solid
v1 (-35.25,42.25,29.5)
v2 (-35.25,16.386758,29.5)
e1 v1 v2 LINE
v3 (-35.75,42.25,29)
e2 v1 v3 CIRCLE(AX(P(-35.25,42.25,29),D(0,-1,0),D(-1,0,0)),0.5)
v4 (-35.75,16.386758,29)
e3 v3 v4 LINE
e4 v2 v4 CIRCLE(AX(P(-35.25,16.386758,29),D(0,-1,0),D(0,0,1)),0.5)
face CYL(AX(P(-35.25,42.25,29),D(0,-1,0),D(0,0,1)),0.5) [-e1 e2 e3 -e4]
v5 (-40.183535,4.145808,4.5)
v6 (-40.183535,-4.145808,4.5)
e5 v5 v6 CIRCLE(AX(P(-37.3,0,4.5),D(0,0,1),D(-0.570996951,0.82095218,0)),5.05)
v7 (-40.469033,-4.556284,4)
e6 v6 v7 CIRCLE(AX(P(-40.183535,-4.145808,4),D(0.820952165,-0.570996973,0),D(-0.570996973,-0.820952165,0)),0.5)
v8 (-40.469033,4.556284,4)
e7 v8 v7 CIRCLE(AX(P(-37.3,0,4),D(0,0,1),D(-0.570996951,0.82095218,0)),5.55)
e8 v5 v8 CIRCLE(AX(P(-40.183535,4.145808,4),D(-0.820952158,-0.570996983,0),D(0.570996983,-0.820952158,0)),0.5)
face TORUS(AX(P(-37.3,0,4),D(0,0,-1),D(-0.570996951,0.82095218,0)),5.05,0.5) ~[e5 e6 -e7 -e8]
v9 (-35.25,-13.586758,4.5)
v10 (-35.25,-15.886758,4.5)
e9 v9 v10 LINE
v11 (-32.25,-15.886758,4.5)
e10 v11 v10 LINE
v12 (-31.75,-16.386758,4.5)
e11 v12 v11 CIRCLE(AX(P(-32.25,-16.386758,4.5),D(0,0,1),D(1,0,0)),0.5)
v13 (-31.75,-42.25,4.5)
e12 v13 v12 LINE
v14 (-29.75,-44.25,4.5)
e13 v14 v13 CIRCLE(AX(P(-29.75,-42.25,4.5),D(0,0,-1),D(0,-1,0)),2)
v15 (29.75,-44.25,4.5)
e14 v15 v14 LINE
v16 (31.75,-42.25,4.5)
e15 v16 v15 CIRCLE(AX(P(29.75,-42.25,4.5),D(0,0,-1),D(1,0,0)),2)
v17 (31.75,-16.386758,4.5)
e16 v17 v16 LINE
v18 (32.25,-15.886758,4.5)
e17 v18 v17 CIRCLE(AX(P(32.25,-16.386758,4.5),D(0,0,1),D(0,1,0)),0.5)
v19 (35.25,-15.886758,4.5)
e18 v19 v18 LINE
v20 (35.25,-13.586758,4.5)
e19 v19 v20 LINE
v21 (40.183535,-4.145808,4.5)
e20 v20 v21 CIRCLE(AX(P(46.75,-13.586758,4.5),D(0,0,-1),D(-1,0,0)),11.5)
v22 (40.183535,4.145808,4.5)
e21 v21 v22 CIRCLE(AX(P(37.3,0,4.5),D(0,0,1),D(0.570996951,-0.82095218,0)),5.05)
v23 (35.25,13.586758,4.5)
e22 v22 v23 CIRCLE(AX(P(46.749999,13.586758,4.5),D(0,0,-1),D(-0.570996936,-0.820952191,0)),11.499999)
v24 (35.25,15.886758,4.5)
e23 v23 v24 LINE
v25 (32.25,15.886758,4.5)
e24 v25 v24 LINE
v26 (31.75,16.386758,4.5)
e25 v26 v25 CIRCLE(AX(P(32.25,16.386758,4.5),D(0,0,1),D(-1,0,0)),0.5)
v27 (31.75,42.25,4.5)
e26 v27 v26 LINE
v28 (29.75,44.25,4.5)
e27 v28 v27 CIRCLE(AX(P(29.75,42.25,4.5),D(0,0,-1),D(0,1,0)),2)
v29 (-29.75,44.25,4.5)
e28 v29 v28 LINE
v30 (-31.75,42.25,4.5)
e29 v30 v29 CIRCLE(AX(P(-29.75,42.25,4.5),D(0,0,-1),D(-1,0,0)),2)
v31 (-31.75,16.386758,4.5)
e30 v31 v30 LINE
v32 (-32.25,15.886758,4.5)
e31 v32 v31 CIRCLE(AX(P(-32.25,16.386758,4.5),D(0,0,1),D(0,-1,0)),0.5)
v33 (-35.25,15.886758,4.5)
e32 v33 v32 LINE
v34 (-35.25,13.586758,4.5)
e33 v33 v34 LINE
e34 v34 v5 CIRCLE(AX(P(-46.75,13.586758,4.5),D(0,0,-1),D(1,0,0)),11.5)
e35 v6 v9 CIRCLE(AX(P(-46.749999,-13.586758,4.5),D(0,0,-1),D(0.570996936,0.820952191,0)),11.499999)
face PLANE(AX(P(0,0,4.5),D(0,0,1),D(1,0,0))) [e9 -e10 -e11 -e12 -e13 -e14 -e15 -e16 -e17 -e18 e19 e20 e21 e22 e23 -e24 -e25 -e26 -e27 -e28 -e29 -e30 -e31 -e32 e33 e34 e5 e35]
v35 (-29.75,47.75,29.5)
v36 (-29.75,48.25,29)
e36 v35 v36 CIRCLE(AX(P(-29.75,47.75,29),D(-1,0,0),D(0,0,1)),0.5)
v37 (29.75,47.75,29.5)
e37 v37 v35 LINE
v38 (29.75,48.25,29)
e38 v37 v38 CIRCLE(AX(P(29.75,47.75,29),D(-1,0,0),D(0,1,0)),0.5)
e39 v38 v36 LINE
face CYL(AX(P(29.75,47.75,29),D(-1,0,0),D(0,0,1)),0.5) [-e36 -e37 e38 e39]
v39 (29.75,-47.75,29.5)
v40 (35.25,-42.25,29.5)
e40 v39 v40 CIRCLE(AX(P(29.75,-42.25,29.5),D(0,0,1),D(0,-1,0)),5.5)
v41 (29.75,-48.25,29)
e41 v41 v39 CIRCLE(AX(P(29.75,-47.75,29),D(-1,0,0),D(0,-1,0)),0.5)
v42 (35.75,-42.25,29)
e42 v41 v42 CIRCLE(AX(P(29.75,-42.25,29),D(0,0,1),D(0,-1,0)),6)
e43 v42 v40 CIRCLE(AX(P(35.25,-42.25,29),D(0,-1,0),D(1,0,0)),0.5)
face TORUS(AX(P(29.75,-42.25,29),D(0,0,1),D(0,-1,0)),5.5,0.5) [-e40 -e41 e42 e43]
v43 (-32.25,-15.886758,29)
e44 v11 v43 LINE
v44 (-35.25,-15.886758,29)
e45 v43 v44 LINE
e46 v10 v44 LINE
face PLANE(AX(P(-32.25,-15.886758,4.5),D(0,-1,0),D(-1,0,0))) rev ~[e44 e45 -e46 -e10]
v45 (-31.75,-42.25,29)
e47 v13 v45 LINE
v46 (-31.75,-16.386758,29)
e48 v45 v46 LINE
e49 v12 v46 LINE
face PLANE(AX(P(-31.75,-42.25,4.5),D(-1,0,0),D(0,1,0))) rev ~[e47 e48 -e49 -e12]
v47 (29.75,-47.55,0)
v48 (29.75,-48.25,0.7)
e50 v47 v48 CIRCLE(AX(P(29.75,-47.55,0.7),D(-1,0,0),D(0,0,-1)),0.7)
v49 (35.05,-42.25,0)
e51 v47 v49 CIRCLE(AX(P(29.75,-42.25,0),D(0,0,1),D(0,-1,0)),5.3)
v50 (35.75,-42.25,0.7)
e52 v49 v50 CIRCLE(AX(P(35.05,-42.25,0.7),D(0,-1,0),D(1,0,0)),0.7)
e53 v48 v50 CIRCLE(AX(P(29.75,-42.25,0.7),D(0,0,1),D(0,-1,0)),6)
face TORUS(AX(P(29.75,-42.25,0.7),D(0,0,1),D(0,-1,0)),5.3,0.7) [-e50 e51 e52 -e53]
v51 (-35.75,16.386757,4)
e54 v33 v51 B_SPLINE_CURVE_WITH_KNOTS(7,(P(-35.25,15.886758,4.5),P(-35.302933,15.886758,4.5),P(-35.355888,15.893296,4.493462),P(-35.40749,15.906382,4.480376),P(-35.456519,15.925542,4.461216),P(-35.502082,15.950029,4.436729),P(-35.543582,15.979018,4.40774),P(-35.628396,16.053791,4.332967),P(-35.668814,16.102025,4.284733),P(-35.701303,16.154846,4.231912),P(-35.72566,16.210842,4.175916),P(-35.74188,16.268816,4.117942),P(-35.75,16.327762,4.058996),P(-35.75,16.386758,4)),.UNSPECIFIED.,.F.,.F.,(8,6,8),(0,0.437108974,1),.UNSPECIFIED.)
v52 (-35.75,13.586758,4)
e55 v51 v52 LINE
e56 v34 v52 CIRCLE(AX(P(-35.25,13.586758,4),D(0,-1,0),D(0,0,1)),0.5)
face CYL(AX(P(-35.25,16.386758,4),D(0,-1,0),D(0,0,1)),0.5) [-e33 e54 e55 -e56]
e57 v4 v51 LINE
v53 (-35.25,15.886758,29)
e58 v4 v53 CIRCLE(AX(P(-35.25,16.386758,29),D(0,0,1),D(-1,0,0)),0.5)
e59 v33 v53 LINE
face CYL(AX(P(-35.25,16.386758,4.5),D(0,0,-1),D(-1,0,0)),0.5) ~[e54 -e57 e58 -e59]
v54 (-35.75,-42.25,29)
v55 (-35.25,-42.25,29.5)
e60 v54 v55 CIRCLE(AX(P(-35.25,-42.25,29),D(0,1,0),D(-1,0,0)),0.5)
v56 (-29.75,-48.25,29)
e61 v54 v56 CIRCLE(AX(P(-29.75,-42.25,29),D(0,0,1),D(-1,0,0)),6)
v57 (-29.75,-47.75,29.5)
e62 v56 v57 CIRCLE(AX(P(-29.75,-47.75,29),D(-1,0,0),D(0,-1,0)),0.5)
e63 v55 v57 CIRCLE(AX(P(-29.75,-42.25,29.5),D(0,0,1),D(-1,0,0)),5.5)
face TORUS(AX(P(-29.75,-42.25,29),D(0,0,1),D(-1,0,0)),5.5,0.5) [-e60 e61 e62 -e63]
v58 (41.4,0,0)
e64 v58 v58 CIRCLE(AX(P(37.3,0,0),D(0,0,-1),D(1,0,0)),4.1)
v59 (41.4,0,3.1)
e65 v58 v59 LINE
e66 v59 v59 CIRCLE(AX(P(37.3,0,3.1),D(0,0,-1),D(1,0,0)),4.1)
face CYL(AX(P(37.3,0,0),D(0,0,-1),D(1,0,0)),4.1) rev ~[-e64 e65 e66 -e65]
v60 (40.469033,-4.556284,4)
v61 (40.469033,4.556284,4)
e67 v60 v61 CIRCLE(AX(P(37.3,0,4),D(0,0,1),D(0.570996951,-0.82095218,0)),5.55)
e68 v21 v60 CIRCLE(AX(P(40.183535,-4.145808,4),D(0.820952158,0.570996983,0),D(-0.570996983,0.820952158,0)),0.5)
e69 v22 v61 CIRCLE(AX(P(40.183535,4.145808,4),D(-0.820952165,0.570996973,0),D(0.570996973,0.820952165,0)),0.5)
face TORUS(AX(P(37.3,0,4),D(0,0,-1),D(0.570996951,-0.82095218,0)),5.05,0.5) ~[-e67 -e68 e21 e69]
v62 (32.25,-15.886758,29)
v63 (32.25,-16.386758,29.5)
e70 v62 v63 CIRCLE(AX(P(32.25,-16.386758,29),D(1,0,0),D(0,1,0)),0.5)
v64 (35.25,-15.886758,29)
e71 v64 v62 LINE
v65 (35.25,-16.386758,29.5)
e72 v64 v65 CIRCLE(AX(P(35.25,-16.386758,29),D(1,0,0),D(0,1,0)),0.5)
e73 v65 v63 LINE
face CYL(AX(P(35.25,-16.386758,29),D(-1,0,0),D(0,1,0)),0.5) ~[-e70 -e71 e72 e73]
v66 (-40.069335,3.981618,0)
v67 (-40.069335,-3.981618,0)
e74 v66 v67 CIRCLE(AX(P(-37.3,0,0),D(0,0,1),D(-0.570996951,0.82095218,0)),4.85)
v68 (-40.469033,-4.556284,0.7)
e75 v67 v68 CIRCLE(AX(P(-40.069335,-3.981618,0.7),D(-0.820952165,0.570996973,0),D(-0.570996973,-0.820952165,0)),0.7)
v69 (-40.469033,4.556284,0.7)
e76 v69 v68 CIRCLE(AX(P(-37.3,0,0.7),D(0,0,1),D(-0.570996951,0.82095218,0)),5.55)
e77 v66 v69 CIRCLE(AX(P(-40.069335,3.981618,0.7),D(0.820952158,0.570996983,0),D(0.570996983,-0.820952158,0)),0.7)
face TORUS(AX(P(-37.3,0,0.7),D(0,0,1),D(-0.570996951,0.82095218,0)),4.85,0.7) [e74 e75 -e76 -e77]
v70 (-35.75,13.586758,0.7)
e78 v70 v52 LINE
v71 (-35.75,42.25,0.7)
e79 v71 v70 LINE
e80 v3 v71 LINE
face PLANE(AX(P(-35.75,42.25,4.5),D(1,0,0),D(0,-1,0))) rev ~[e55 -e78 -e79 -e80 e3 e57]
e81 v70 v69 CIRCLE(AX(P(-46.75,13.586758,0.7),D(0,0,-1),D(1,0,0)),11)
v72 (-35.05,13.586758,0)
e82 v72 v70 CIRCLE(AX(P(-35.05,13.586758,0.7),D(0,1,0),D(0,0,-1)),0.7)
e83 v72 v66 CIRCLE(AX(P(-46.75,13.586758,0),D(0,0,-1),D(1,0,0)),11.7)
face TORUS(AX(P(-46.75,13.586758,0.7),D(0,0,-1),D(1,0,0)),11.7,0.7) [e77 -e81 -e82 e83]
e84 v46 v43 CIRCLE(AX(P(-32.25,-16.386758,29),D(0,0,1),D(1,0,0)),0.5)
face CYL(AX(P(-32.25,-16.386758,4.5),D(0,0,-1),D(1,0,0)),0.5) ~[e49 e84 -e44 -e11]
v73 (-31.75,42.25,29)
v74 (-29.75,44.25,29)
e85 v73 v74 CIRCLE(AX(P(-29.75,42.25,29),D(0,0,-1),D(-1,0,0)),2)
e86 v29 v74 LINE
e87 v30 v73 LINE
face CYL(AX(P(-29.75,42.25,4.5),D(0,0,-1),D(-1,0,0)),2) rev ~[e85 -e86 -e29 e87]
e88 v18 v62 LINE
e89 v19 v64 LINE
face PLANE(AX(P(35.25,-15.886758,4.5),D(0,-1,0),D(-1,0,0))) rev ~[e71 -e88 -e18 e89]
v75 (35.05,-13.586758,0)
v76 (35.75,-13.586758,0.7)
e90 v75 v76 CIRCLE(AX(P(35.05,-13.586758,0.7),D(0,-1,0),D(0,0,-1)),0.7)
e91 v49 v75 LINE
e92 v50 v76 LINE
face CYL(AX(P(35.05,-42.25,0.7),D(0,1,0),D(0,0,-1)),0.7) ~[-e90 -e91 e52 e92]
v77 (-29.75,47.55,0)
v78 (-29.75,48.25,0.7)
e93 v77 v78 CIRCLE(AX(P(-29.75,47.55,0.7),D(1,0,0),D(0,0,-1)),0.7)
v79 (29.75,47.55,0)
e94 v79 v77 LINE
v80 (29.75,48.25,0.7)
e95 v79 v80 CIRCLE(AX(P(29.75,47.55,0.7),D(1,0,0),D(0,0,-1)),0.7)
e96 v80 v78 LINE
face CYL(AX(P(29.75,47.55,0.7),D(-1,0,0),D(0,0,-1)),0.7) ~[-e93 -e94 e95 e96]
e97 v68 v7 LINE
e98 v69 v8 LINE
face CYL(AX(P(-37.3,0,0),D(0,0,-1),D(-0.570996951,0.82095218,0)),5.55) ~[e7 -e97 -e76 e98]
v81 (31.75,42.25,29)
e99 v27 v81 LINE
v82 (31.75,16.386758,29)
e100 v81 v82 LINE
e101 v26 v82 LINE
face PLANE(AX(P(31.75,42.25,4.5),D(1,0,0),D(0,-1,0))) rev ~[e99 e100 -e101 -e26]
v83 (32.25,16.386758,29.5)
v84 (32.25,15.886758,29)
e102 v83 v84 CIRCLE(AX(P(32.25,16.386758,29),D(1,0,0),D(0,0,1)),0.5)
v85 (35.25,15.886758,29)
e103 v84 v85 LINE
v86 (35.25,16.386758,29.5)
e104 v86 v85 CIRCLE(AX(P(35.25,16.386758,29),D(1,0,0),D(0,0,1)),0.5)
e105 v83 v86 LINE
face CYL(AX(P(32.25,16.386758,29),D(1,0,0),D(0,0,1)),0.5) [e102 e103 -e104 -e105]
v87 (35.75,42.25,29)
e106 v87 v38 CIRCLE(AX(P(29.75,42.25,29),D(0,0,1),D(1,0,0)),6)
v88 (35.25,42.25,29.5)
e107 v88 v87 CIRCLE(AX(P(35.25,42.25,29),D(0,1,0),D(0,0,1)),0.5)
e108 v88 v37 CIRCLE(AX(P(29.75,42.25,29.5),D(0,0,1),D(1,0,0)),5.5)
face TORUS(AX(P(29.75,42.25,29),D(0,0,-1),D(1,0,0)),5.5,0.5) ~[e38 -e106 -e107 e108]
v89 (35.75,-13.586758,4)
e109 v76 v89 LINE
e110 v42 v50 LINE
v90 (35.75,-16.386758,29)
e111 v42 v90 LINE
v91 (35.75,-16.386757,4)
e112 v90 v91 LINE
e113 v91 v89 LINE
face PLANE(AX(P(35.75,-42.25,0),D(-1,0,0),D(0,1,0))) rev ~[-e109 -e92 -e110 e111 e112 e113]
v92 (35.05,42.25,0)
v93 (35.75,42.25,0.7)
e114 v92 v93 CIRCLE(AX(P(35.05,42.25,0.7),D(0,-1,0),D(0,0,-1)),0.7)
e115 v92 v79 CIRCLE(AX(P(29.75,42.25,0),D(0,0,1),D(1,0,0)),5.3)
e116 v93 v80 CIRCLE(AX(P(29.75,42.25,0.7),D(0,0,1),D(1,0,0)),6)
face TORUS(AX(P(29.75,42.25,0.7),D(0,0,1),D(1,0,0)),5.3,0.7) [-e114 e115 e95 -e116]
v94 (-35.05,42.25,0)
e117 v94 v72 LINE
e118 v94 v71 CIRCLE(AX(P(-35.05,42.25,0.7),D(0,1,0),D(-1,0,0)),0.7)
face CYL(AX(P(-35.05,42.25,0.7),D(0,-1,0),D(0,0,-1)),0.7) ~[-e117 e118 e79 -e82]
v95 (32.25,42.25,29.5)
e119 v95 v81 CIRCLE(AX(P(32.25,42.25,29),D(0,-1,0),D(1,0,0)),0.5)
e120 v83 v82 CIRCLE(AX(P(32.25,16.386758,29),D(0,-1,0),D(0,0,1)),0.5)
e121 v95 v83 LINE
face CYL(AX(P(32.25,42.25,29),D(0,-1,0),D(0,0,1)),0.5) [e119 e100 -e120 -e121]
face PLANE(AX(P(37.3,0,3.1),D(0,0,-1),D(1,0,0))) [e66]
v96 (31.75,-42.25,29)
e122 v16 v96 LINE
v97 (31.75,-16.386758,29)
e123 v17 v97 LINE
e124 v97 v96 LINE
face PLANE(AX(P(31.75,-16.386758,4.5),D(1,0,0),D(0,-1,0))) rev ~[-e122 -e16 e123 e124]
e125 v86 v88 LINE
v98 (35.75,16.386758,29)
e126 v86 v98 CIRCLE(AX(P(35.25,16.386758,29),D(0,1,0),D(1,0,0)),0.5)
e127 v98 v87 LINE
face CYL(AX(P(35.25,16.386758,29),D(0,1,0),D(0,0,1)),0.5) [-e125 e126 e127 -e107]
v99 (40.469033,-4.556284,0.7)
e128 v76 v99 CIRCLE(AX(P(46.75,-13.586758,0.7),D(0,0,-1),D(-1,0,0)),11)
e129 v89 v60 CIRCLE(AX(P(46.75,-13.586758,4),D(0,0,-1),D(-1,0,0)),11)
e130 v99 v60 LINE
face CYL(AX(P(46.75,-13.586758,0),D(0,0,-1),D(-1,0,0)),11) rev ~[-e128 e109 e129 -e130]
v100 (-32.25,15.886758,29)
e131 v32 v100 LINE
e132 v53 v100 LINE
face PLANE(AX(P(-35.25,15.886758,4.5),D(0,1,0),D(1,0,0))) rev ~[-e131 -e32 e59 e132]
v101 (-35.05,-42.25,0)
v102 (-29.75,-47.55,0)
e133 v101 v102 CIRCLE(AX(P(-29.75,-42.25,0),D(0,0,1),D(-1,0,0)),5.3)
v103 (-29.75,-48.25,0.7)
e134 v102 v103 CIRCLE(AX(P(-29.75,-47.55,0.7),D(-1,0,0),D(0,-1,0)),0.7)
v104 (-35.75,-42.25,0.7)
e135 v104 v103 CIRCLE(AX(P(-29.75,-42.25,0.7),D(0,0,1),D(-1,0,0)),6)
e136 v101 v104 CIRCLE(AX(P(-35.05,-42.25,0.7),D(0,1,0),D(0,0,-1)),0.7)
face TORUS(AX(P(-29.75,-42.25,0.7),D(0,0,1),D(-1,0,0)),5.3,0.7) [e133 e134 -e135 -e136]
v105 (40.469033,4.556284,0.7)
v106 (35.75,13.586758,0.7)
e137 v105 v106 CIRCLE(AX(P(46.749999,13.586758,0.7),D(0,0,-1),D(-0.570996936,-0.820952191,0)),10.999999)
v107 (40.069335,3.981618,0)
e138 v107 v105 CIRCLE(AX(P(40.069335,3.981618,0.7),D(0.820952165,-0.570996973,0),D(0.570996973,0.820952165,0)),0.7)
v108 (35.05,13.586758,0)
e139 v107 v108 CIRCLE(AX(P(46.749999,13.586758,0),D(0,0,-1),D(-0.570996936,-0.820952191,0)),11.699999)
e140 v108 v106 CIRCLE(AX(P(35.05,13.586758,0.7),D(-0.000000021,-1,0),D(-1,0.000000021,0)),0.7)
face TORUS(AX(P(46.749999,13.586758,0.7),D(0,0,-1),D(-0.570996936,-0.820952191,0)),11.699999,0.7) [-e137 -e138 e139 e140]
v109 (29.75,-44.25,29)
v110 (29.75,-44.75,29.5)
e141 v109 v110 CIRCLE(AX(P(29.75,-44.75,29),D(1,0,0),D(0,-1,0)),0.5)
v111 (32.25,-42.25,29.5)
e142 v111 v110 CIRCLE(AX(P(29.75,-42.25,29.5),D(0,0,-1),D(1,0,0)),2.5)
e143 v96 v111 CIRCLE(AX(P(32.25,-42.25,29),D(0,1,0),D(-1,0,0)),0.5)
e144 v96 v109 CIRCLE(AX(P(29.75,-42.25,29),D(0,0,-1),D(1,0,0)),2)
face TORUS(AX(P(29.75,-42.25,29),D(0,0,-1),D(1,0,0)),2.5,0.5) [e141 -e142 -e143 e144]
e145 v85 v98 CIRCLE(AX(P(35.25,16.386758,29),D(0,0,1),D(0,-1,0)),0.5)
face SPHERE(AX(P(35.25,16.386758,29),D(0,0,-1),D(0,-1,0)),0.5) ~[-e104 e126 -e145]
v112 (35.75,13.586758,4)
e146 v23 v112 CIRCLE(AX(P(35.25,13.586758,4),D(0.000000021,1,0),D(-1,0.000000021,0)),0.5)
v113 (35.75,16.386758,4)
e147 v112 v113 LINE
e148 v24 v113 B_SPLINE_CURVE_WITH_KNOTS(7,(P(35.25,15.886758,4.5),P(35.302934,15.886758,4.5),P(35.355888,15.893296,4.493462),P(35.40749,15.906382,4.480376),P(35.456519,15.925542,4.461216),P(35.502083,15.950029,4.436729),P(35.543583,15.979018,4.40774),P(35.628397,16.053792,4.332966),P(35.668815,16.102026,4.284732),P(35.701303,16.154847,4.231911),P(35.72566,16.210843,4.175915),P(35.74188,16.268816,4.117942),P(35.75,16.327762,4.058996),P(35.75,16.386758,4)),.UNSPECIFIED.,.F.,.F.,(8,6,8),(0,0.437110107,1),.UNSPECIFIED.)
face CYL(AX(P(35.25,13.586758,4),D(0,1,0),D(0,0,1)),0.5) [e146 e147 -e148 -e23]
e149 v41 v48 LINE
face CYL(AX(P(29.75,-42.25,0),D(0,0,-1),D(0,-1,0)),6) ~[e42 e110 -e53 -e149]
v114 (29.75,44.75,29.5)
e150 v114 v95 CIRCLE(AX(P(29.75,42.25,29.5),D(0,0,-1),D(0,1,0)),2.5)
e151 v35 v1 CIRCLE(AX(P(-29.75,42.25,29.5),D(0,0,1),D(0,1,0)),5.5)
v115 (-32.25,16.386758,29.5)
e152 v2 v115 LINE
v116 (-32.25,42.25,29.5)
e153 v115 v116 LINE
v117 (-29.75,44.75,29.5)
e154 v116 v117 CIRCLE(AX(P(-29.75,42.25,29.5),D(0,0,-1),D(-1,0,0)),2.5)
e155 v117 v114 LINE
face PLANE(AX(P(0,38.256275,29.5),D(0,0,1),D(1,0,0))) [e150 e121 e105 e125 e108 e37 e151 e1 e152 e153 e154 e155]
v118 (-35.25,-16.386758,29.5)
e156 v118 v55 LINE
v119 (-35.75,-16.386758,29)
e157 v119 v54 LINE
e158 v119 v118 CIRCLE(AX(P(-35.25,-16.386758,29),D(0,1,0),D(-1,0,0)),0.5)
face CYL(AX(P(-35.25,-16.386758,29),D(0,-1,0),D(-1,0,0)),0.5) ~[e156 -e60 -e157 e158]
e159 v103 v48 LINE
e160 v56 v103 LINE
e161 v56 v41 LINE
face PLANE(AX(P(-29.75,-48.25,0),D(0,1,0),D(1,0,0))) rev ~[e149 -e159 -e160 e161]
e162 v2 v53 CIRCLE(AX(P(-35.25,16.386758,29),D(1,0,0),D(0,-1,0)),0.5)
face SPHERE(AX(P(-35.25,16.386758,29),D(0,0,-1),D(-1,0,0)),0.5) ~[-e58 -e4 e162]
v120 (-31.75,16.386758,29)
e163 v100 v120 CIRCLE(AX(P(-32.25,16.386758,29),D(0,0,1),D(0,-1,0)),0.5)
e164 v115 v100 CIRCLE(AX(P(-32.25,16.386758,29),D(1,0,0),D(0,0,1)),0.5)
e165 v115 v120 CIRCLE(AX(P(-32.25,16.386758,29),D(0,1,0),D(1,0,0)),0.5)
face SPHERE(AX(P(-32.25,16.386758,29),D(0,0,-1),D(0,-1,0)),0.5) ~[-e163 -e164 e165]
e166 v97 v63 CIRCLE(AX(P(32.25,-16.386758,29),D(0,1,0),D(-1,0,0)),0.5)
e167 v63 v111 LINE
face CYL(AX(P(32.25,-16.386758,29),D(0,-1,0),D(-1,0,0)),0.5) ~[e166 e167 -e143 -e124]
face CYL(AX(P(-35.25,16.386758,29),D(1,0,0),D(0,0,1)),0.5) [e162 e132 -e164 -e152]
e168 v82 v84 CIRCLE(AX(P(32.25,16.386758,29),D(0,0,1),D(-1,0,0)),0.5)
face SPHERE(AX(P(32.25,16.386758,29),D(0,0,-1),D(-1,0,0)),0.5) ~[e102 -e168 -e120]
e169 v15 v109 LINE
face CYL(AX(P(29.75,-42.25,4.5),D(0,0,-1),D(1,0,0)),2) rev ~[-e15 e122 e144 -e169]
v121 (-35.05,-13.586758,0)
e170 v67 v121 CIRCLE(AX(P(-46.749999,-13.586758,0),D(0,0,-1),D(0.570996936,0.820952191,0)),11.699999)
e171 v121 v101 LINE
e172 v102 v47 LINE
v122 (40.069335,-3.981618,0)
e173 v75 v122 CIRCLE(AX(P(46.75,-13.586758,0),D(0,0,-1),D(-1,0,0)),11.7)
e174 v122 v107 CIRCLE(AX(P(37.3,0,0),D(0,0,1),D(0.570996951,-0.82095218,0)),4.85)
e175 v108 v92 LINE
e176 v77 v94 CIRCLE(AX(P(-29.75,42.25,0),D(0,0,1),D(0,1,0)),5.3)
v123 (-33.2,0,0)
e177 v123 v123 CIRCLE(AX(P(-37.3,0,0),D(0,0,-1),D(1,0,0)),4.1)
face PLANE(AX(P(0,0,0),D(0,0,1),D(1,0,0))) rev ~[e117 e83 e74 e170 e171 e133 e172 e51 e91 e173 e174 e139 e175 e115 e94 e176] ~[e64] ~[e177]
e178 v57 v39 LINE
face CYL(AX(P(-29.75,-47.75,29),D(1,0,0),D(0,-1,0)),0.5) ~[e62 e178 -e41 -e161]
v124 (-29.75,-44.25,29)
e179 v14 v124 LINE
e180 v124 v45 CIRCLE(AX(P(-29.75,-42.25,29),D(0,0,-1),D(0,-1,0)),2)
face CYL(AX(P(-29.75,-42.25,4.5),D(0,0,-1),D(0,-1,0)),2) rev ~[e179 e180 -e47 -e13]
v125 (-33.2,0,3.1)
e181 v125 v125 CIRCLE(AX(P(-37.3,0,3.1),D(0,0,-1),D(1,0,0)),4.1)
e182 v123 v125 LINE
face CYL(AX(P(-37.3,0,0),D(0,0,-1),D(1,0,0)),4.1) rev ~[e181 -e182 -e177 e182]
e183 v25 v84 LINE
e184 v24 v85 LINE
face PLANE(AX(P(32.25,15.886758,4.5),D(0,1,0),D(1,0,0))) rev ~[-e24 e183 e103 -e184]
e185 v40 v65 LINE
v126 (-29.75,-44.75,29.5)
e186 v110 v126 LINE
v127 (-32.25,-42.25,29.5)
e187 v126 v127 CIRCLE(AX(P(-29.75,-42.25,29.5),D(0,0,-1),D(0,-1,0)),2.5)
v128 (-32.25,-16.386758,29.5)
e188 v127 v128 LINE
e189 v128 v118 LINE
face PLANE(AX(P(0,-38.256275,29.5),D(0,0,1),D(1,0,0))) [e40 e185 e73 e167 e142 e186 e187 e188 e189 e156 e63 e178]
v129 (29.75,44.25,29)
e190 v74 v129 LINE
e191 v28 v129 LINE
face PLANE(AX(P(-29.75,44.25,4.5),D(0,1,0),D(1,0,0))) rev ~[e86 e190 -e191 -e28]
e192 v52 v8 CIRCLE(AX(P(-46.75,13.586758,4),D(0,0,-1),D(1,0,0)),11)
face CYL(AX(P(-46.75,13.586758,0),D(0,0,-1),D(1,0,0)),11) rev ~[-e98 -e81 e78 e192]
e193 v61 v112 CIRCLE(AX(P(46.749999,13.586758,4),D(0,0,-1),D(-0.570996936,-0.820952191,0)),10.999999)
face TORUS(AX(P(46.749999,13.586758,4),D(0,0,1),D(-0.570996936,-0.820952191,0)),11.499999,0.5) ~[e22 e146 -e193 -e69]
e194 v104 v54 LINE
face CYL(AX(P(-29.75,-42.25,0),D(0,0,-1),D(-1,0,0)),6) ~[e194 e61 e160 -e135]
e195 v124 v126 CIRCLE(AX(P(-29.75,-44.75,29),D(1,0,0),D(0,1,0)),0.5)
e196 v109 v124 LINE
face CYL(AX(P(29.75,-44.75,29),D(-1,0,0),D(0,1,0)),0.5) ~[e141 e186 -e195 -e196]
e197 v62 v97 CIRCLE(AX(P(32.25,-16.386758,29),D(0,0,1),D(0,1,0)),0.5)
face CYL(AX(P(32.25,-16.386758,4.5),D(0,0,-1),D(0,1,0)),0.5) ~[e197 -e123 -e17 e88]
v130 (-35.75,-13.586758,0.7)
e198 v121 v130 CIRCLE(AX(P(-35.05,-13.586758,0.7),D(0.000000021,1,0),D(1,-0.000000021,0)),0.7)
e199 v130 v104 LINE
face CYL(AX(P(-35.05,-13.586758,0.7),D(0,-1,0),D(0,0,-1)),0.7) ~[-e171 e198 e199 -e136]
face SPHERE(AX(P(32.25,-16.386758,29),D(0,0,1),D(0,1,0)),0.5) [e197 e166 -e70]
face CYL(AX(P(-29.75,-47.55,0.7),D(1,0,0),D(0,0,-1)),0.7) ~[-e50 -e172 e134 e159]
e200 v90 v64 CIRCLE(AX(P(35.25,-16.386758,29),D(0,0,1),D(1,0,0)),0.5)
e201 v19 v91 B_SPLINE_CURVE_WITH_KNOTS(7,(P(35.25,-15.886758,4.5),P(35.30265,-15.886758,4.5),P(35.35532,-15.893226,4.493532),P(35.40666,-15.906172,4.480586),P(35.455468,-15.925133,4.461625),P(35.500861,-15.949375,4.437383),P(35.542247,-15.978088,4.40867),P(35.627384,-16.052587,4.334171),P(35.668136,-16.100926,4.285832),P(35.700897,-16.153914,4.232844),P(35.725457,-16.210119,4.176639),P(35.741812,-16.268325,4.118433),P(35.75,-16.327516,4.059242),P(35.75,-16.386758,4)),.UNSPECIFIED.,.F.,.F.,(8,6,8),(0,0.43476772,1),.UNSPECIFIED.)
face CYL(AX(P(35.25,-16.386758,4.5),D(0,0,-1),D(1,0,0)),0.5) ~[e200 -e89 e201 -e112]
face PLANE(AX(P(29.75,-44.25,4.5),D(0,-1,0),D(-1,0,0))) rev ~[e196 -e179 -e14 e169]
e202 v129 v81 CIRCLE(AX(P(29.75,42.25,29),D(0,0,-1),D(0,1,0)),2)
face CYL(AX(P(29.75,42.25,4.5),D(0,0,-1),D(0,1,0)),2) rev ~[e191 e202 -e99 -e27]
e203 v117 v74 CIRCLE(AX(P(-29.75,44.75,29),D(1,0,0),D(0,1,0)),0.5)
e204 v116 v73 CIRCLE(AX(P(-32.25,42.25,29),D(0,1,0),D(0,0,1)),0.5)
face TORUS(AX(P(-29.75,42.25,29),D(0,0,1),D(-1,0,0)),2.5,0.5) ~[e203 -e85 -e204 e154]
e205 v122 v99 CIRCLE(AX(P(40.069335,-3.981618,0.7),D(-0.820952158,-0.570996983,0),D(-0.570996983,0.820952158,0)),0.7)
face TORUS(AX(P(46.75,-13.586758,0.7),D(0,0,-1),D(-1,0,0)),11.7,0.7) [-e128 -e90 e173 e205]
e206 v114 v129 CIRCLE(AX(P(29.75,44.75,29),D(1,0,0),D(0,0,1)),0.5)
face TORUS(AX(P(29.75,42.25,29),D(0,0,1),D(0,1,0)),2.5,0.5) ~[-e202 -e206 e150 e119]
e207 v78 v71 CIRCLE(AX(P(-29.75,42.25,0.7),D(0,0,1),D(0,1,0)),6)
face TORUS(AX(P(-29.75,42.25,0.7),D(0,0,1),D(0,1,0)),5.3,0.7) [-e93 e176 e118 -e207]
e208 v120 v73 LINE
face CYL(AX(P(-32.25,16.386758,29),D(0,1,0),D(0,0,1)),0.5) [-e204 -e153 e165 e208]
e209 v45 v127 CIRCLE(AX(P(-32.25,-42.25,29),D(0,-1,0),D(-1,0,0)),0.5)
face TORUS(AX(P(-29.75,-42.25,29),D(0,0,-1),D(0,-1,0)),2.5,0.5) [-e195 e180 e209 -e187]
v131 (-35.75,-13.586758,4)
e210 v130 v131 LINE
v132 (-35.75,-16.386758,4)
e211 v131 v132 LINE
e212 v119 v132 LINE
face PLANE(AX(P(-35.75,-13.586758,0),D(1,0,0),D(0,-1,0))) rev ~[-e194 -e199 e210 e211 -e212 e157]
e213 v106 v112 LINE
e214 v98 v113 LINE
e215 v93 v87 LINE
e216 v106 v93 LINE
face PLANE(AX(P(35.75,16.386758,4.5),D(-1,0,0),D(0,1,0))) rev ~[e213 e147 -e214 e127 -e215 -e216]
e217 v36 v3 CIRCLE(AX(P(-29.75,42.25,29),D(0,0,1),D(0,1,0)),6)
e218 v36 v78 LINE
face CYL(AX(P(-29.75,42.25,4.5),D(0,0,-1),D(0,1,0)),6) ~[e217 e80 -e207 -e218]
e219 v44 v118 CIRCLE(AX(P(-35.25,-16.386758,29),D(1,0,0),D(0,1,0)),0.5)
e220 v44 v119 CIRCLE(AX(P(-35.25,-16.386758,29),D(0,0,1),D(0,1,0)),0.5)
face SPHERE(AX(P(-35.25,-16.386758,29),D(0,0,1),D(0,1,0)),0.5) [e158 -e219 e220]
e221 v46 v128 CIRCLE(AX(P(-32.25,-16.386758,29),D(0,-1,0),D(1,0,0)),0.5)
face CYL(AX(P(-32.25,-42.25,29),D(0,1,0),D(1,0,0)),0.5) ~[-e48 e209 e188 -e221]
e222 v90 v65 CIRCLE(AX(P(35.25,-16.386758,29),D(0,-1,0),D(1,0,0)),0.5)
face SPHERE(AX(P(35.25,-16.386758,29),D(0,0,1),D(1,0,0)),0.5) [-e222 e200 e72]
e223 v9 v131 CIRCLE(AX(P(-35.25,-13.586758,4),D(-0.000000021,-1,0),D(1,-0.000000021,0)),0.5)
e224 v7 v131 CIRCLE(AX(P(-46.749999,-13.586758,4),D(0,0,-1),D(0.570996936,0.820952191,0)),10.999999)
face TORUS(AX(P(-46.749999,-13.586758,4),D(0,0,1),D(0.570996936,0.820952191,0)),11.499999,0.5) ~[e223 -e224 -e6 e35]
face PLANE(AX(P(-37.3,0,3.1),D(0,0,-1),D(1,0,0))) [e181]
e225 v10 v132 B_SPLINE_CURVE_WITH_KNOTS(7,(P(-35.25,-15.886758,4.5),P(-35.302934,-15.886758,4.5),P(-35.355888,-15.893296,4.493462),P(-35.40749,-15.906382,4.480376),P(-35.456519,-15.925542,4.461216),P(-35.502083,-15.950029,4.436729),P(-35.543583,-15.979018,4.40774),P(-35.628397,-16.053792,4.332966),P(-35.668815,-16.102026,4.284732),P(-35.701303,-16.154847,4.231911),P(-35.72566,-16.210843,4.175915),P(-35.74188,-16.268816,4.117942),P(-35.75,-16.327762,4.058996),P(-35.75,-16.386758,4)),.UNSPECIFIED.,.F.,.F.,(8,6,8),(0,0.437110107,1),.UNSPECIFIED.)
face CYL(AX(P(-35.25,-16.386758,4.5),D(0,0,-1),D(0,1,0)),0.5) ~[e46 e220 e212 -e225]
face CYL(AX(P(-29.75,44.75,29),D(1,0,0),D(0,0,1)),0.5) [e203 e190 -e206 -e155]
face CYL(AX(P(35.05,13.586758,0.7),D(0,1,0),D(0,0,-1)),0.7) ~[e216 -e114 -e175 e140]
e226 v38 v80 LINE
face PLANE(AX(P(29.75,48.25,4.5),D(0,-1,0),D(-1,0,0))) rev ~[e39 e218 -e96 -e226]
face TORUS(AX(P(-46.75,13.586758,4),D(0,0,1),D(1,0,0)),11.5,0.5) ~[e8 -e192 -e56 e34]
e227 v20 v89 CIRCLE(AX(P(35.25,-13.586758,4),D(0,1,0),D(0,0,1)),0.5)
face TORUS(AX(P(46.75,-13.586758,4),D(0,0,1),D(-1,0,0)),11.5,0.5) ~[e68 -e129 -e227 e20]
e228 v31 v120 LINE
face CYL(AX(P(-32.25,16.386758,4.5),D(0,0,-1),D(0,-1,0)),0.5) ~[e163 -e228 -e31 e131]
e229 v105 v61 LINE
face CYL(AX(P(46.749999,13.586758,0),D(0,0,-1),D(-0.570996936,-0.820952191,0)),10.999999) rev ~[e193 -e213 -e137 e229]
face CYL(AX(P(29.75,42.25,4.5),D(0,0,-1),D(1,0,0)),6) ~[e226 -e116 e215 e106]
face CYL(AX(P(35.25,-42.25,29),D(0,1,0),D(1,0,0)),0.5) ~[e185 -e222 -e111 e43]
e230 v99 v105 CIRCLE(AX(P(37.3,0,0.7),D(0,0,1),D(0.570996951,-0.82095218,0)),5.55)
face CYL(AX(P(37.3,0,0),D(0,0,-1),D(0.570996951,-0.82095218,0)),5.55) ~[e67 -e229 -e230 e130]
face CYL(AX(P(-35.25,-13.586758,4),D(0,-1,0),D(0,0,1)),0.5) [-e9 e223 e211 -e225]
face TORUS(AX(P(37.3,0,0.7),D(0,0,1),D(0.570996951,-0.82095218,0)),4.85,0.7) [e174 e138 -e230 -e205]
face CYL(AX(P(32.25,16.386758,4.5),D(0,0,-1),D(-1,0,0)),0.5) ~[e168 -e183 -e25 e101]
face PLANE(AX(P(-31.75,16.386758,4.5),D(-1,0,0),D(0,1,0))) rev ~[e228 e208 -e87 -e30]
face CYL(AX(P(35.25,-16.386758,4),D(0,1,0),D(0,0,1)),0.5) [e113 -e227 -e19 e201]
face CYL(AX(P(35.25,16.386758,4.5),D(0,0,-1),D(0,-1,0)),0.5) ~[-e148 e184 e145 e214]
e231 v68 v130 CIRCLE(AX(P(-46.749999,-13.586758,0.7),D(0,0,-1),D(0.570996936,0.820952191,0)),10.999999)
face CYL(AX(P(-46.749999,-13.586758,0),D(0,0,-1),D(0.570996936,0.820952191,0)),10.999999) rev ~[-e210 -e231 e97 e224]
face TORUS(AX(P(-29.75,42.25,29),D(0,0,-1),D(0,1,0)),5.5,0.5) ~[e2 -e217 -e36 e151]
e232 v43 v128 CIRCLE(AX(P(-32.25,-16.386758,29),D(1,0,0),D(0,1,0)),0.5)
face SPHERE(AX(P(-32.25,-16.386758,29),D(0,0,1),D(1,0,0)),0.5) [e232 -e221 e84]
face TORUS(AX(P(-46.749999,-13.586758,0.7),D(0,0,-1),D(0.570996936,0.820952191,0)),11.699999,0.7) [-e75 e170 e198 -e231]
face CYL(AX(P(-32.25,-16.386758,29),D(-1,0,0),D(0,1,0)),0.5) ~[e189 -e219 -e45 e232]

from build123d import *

# Parameters (mm, degrees)
F1_DEPTH  = 4.5
F2_R      = 4.1
F3_DEPTH  = 3.1
F5_DEPTH  = 25
F6_R      = 0.7
F7_R      = 0.5
F8_R      = 0.5
F9_R      = 0.5
F10_R     = 10.1889350931
F11_DEPTH = 25


# Not quite as in the source:
# - ends of sketch curves that miss each other by under 0.0002 mm in the source are joined


with BuildPart() as f1:
    # F0 (on Top) → F1 (new body)
    with BuildSketch(Plane.XY):
        with BuildLine():
            Line((35.75, 13.586758), (35.75, 42.25))
            ThreePointArc((35.75, 42.25), (33.9926406871, 46.4926406871), (29.75, 48.25))
            Line((29.75, 48.25), (-29.75, 48.25))
            ThreePointArc((-29.75, 48.25), (-33.9926406871, 46.4926406871), (-35.75, 42.25))
            Line((-35.75, 42.25), (-35.75, 13.586758))
            ThreePointArc((-35.75, 13.586758), (-37.0008811945, 8.4921841693), (-40.4690331848, 4.5562842657))
            ThreePointArc((-40.4690331848, 4.5562842657), (-42.85, 0), (-40.4690333064, -4.5562844405))
            ThreePointArc((-40.4690333064, -4.5562844405), (-37.0008811945, -8.4921841693), (-35.75, -13.586758))
            Line((-35.75, -13.586758), (-35.75, -42.25))
            ThreePointArc((-35.75, -42.25), (-33.9926406871, -46.4926406871), (-29.75, -48.25))
            Line((-29.75, -48.25), (29.75, -48.25))
            ThreePointArc((29.75, -48.25), (33.9926406871, -46.4926406871), (35.75, -42.25))
            Line((35.75, -42.25), (35.75, -13.586758))
            ThreePointArc((35.75, -13.586758), (37.0008811945, -8.4921841693), (40.4690331848, -4.5562842657))
            ThreePointArc((40.4690331848, -4.5562842657), (42.85, 0), (40.4690333064, 4.5562844405))
            ThreePointArc((40.4690333064, 4.5562844405), (37.0008811945, 8.4921841693), (35.75, 13.586758))
        make_face()
    extrude(amount=F1_DEPTH)

    # F2 (on face) → F3 (cut)
    with BuildSketch(Plane(origin=(0, 0, 0), x_dir=(1, 0, 0), z_dir=(0, 0, -1))):
        with Locations((-37.3, 0)):
            Circle(F2_R)
        with Locations((37.3, 0)):
            Circle(F2_R)
    extrude(amount=-F3_DEPTH, mode=Mode.SUBTRACT)

    # F4 (on face) → F5 (join)
    with BuildSketch(Plane.XY.offset(4.5)):
        with BuildLine():
            Line((-35.75, 42.25), (-35.75, 16.386758))
            ThreePointArc((-35.75, 16.386758), (-35.6035533906, 16.0332046094), (-35.25, 15.886758))
            Line((-35.25, 15.886758), (-32.25, 15.886758))
            ThreePointArc((-32.25, 15.886758), (-31.8964466094, 16.0332046094), (-31.75, 16.386758))
            Line((-31.75, 16.386758), (-31.75, 42.25))
            ThreePointArc((-31.75, 42.25), (-31.1642135624, 43.6642135624), (-29.75, 44.25))
            Line((-29.75, 44.25), (29.75, 44.25))
            ThreePointArc((29.75, 44.25), (31.1642135624, 43.6642135624), (31.75, 42.25))
            Line((31.75, 42.25), (31.75, 16.386758))
            ThreePointArc((31.75, 16.386758), (31.8964466094, 16.0332046094), (32.25, 15.886758))
            Line((32.25, 15.886758), (35.25, 15.886758))
            ThreePointArc((35.25, 15.886758), (35.6035533906, 16.0332046094), (35.75, 16.386758))
            Line((35.75, 16.386758), (35.75, 42.25))
            ThreePointArc((35.75, 42.25), (33.9926406871, 46.4926406871), (29.75, 48.25))
            Line((29.75, 48.25), (-29.75, 48.25))
            ThreePointArc((-29.75, 48.25), (-33.9926406871, 46.4926406871), (-35.75, 42.25))
        make_face()
        with BuildLine():
            Line((35.75, -42.25), (35.75, -16.386758))
            ThreePointArc((35.75, -16.386758), (35.6035533906, -16.0332046094), (35.25, -15.886758))
            Line((35.25, -15.886758), (32.25, -15.886758))
            ThreePointArc((32.25, -15.886758), (31.8964466094, -16.0332046094), (31.75, -16.386758))
            Line((31.75, -16.386758), (31.75, -42.25))
            ThreePointArc((31.75, -42.25), (31.1642135624, -43.6642135624), (29.75, -44.25))
            Line((29.75, -44.25), (-29.75, -44.25))
            ThreePointArc((-29.75, -44.25), (-31.1642135624, -43.6642135624), (-31.75, -42.25))
            Line((-31.75, -42.25), (-31.75, -16.386758))
            ThreePointArc((-31.75, -16.386758), (-31.8964466094, -16.0332046094), (-32.25, -15.886758))
            Line((-32.25, -15.886758), (-35.25, -15.886758))
            ThreePointArc((-35.25, -15.886758), (-35.6035533906, -16.0332046094), (-35.75, -16.386758))
            Line((-35.75, -16.386758), (-35.75, -42.25))
            ThreePointArc((-35.75, -42.25), (-33.9926406871, -46.4926406871), (-29.75, -48.25))
            Line((-29.75, -48.25), (29.75, -48.25))
            ThreePointArc((29.75, -48.25), (33.9926406871, -46.4926406871), (35.75, -42.25))
        make_face()
    extrude(amount=F5_DEPTH)

    # F6
    f6_edges = [f1.edges().sort_by_distance(p)[0] for p in [
        (0, 48.25, 0),
        (-33.992641, 46.492641, 0),
        (-35.75, 27.918379, 0),
        (-37.000881, 8.492184, 0),
        (-42.85, 0, 0),
        (-37.000881, -8.492184, 0),
        (-35.75, -27.918379, 0),
        (-33.992641, -46.492641, 0),
        (0, -48.25, 0),
        (33.992641, -46.492641, 0),
        (35.75, -27.918379, 0),
        (37.000881, -8.492184, 0),
        (42.85, 0, 0),
        (37.000881, 8.492184, 0),
        (35.75, 27.918379, 0),
        (33.992641, 46.492641, 0),
    ]]
    fillet(f6_edges, radius=F6_R)

    # F7
    f7_edges = [f1.edges().sort_by_distance(p)[0] for p in [
        (-33.75, -15.886758, 29.5),
        (-31.896447, -16.033205, 29.5),
        (-31.75, -29.318379, 29.5),
        (-35.603553, -16.033205, 29.5),
        (-35.75, -29.318379, 29.5),
        (-33.992641, -46.492641, 29.5),
        (-31.164214, -43.664214, 29.5),
        (0, -44.25, 29.5),
        (0, -48.25, 29.5),
        (33.992641, -46.492641, 29.5),
        (31.164214, -43.664214, 29.5),
        (31.75, -29.318379, 29.5),
        (35.75, -29.318379, 29.5),
        (35.603553, -16.033205, 29.5),
        (33.75, -15.886758, 29.5),
        (31.896447, -16.033205, 29.5),
        (33.75, 15.886758, 29.5),
        (31.896447, 16.033205, 29.5),
        (31.75, 29.318379, 29.5),
        (35.603553, 16.033205, 29.5),
        (35.75, 29.318379, 29.5),
        (33.992641, 46.492641, 29.5),
        (31.164214, 43.664214, 29.5),
        (0, 44.25, 29.5),
        (0, 48.25, 29.5),
        (-31.164214, 43.664214, 29.5),
        (-33.992641, 46.492641, 29.5),
        (-35.75, 29.318379, 29.5),
        (-31.75, 29.318379, 29.5),
        (-31.896447, 16.033205, 29.5),
        (-33.75, 15.886758, 29.5),
        (-35.603553, 16.033205, 29.5),
    ]]
    fillet(f7_edges, radius=F7_R)

    # F8
    f8_edges = [f1.edges().sort_by_distance(p)[0] for p in [
        (37.000881, -8.492184, 4.5),
        (42.85, 0, 4.5),
        (37.000881, 8.492184, 4.5),
        (35.75, -14.986758, 4.5),
        (35.75, 14.986758, 4.5),
    ]]
    fillet(f8_edges, radius=F8_R)

    # F9
    f9_edges = [f1.edges().sort_by_distance(p)[0] for p in [
        (-35.75, -14.986758, 4.5),
        (-37.000881, -8.492184, 4.5),
        (-42.85, 0, 4.5),
        (-35.75, 14.986758, 4.5),
        (-37.000881, 8.492184, 4.5),
    ]]
    fillet(f9_edges, radius=F9_R)

    # F10 (on face) → F11 (cut)
    with BuildSketch(Plane.XY.offset(4.5)):
        Circle(F10_R)
    extrude(amount=F11_DEPTH, mode=Mode.SUBTRACT)


solid = f1.part
